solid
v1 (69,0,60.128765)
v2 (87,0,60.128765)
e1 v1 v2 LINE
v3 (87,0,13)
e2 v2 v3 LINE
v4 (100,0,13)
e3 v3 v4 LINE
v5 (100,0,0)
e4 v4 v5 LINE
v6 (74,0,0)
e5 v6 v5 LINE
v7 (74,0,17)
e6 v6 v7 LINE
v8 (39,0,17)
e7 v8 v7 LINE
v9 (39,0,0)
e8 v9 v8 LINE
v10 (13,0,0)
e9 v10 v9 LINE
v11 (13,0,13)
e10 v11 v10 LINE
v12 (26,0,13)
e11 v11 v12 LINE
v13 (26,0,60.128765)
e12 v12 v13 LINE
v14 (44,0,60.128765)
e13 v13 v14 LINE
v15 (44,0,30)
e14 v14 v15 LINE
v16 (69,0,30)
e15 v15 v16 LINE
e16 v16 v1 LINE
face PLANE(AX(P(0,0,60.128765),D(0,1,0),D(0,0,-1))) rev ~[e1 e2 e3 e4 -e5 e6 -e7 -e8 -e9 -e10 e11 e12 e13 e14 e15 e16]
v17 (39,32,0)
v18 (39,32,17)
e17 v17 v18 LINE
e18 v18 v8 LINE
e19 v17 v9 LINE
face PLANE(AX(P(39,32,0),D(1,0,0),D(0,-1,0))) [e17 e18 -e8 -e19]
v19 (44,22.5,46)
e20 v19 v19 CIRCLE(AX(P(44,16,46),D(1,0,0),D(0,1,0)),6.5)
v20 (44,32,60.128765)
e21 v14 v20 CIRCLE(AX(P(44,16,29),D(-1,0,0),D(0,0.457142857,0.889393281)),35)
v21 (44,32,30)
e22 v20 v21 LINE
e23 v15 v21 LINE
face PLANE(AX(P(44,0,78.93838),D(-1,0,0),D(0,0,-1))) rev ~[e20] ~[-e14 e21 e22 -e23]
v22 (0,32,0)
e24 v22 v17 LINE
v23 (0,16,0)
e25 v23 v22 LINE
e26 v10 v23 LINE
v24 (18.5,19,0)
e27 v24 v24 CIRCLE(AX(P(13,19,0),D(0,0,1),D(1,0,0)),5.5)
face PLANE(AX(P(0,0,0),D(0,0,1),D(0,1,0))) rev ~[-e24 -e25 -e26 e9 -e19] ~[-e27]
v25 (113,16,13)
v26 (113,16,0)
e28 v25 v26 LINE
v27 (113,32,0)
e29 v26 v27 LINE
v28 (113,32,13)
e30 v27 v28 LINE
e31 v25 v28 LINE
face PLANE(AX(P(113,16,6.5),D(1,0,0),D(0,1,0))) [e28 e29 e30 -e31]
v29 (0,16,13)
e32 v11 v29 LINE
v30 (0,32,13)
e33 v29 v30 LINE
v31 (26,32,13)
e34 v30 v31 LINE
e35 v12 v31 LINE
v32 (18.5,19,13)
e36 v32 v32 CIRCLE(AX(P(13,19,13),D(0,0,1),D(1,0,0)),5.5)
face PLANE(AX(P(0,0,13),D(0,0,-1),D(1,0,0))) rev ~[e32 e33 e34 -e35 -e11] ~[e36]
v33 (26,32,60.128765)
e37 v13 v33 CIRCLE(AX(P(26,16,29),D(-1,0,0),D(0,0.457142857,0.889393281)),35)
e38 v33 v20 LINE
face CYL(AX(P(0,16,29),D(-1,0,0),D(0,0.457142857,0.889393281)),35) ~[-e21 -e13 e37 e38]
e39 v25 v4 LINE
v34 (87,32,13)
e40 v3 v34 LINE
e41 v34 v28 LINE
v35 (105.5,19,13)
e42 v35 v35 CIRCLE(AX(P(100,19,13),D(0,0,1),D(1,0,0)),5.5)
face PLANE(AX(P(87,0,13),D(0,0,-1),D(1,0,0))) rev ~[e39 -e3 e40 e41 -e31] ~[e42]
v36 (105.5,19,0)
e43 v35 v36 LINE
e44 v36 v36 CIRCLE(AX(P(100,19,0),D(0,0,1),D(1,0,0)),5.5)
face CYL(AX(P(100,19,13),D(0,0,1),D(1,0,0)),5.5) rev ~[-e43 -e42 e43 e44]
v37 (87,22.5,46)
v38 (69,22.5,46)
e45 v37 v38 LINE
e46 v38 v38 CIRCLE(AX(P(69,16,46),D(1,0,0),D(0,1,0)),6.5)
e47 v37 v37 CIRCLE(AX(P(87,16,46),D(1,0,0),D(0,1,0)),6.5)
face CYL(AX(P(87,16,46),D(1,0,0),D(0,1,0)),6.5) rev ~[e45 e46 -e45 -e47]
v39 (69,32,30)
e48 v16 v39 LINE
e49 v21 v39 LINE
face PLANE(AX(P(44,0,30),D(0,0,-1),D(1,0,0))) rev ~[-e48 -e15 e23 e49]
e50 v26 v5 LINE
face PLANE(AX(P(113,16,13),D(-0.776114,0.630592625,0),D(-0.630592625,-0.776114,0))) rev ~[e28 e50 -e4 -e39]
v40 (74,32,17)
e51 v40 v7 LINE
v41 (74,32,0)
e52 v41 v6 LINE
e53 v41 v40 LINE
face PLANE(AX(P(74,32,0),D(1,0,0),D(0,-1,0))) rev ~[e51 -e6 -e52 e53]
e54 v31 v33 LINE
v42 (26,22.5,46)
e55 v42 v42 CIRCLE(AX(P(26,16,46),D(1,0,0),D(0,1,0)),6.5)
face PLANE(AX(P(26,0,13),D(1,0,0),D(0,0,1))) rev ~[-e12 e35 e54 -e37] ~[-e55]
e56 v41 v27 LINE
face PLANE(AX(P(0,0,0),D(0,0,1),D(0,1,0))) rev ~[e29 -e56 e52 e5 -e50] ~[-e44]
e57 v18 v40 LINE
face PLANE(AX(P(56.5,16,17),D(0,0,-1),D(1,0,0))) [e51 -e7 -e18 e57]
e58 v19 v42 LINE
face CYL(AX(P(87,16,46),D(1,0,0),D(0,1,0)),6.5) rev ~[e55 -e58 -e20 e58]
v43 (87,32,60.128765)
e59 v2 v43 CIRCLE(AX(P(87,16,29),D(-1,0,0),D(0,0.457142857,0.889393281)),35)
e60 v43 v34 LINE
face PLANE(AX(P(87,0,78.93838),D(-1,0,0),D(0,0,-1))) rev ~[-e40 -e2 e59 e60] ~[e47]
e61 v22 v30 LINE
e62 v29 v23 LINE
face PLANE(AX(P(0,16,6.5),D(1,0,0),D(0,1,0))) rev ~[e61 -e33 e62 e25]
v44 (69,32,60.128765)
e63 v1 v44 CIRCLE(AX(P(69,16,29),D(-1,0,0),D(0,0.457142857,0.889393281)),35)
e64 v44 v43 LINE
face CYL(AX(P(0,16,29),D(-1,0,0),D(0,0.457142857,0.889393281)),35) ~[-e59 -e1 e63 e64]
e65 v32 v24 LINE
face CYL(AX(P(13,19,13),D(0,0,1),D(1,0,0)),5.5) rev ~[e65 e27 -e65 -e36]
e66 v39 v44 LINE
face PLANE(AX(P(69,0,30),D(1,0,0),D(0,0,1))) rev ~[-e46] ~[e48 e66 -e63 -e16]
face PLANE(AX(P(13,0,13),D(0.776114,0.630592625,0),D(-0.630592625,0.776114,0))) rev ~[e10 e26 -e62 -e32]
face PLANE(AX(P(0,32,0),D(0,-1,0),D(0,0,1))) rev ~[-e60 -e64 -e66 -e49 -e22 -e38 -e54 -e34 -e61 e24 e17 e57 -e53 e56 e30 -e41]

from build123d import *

# Parameters (mm, degrees)
F0_W      = 32
F0_H      = 13
F1_DEPTH  = 113
F2_W      = 35
F2_H      = 32
F3_DEPTH  = 17
F4_W      = 25
F4_H      = 30.1287648325
F4_H_2    = 18.8096150512
F4_W_2    = 26
F4_H_3    = 47.1287648325
F5_DEPTH  = 32.001
F6_R      = 5.5
F7_DEPTH  = 13.001
F8_R      = 5.5
F9_DEPTH  = 13.001
F10_R     = 6.5
F11_DEPTH = 87.001


with BuildPart() as f1:
    # F0 (on Right) → F1 (new body)
    with BuildSketch(Plane.YZ):
        with Locations((16, 6.5)):
            Rectangle(F0_W, F0_H)
        with BuildLine():
            Line((0, 60.1287648325), (0, 13))
            Line((0, 13), (32, 13))
            Line((32, 13), (32, 60.1287648325))
            ThreePointArc((32, 60.1287648325), (16, 64), (0, 60.1287648325))
        make_face()
    extrude(amount=F1_DEPTH)

    # F2 (on face) → F3 (cut)
    with BuildSketch(Plane(origin=(0, 0, 0), x_dir=(1, 0, 0), z_dir=(0, 0, -1))):
        with Locations((56.5, -16)):
            Rectangle(F2_W, F2_H)
    extrude(amount=-F3_DEPTH, mode=Mode.SUBTRACT)

    # F4 (on face) → F5 (cut, through all)
    with BuildSketch(Plane.XZ):
        with Locations((56.5, 45.0643824163)):
            Rectangle(F4_W, F4_H)
        with Locations((56.5, 69.5335723582)):
            Rectangle(F4_W, F4_H_2)
        with Locations((100, 36.5643824163)):
            Rectangle(F4_W_2, F4_H_3)
        with Locations((100, 69.5335723582)):
            Rectangle(F4_W_2, F4_H_2)
        with Locations((13, 69.5335723582)):
            Rectangle(F4_W_2, F4_H_2)
        with Locations((13, 36.5643824163)):
            Rectangle(F4_W_2, F4_H_3)
    extrude(amount=-F5_DEPTH, mode=Mode.SUBTRACT)

    # F6 (on face) → F7 (cut, through all)
    with BuildSketch(Plane.XY.offset(13)):
        Polygon((113, 0), (113, 16), (100, 0), align=None)
        with Locations((100, 19)):
            Circle(F6_R)
    extrude(amount=-F7_DEPTH, mode=Mode.SUBTRACT)

    # F8 (on face) → F9 (cut, through all)
    with BuildSketch(Plane.XY.offset(13)):
        with Locations((13, 19)):
            Circle(F8_R)
        Polygon((0, 16), (0, 0), (13, 0), align=None)
    extrude(amount=-F9_DEPTH, mode=Mode.SUBTRACT)

    # F10 (on face) → F11 (cut, through all)
    with BuildSketch(Plane.YZ.offset(87)):
        with Locations((16, 46)):
            Circle(F10_R)
    extrude(amount=-F11_DEPTH, mode=Mode.SUBTRACT)


solid = f1.part
